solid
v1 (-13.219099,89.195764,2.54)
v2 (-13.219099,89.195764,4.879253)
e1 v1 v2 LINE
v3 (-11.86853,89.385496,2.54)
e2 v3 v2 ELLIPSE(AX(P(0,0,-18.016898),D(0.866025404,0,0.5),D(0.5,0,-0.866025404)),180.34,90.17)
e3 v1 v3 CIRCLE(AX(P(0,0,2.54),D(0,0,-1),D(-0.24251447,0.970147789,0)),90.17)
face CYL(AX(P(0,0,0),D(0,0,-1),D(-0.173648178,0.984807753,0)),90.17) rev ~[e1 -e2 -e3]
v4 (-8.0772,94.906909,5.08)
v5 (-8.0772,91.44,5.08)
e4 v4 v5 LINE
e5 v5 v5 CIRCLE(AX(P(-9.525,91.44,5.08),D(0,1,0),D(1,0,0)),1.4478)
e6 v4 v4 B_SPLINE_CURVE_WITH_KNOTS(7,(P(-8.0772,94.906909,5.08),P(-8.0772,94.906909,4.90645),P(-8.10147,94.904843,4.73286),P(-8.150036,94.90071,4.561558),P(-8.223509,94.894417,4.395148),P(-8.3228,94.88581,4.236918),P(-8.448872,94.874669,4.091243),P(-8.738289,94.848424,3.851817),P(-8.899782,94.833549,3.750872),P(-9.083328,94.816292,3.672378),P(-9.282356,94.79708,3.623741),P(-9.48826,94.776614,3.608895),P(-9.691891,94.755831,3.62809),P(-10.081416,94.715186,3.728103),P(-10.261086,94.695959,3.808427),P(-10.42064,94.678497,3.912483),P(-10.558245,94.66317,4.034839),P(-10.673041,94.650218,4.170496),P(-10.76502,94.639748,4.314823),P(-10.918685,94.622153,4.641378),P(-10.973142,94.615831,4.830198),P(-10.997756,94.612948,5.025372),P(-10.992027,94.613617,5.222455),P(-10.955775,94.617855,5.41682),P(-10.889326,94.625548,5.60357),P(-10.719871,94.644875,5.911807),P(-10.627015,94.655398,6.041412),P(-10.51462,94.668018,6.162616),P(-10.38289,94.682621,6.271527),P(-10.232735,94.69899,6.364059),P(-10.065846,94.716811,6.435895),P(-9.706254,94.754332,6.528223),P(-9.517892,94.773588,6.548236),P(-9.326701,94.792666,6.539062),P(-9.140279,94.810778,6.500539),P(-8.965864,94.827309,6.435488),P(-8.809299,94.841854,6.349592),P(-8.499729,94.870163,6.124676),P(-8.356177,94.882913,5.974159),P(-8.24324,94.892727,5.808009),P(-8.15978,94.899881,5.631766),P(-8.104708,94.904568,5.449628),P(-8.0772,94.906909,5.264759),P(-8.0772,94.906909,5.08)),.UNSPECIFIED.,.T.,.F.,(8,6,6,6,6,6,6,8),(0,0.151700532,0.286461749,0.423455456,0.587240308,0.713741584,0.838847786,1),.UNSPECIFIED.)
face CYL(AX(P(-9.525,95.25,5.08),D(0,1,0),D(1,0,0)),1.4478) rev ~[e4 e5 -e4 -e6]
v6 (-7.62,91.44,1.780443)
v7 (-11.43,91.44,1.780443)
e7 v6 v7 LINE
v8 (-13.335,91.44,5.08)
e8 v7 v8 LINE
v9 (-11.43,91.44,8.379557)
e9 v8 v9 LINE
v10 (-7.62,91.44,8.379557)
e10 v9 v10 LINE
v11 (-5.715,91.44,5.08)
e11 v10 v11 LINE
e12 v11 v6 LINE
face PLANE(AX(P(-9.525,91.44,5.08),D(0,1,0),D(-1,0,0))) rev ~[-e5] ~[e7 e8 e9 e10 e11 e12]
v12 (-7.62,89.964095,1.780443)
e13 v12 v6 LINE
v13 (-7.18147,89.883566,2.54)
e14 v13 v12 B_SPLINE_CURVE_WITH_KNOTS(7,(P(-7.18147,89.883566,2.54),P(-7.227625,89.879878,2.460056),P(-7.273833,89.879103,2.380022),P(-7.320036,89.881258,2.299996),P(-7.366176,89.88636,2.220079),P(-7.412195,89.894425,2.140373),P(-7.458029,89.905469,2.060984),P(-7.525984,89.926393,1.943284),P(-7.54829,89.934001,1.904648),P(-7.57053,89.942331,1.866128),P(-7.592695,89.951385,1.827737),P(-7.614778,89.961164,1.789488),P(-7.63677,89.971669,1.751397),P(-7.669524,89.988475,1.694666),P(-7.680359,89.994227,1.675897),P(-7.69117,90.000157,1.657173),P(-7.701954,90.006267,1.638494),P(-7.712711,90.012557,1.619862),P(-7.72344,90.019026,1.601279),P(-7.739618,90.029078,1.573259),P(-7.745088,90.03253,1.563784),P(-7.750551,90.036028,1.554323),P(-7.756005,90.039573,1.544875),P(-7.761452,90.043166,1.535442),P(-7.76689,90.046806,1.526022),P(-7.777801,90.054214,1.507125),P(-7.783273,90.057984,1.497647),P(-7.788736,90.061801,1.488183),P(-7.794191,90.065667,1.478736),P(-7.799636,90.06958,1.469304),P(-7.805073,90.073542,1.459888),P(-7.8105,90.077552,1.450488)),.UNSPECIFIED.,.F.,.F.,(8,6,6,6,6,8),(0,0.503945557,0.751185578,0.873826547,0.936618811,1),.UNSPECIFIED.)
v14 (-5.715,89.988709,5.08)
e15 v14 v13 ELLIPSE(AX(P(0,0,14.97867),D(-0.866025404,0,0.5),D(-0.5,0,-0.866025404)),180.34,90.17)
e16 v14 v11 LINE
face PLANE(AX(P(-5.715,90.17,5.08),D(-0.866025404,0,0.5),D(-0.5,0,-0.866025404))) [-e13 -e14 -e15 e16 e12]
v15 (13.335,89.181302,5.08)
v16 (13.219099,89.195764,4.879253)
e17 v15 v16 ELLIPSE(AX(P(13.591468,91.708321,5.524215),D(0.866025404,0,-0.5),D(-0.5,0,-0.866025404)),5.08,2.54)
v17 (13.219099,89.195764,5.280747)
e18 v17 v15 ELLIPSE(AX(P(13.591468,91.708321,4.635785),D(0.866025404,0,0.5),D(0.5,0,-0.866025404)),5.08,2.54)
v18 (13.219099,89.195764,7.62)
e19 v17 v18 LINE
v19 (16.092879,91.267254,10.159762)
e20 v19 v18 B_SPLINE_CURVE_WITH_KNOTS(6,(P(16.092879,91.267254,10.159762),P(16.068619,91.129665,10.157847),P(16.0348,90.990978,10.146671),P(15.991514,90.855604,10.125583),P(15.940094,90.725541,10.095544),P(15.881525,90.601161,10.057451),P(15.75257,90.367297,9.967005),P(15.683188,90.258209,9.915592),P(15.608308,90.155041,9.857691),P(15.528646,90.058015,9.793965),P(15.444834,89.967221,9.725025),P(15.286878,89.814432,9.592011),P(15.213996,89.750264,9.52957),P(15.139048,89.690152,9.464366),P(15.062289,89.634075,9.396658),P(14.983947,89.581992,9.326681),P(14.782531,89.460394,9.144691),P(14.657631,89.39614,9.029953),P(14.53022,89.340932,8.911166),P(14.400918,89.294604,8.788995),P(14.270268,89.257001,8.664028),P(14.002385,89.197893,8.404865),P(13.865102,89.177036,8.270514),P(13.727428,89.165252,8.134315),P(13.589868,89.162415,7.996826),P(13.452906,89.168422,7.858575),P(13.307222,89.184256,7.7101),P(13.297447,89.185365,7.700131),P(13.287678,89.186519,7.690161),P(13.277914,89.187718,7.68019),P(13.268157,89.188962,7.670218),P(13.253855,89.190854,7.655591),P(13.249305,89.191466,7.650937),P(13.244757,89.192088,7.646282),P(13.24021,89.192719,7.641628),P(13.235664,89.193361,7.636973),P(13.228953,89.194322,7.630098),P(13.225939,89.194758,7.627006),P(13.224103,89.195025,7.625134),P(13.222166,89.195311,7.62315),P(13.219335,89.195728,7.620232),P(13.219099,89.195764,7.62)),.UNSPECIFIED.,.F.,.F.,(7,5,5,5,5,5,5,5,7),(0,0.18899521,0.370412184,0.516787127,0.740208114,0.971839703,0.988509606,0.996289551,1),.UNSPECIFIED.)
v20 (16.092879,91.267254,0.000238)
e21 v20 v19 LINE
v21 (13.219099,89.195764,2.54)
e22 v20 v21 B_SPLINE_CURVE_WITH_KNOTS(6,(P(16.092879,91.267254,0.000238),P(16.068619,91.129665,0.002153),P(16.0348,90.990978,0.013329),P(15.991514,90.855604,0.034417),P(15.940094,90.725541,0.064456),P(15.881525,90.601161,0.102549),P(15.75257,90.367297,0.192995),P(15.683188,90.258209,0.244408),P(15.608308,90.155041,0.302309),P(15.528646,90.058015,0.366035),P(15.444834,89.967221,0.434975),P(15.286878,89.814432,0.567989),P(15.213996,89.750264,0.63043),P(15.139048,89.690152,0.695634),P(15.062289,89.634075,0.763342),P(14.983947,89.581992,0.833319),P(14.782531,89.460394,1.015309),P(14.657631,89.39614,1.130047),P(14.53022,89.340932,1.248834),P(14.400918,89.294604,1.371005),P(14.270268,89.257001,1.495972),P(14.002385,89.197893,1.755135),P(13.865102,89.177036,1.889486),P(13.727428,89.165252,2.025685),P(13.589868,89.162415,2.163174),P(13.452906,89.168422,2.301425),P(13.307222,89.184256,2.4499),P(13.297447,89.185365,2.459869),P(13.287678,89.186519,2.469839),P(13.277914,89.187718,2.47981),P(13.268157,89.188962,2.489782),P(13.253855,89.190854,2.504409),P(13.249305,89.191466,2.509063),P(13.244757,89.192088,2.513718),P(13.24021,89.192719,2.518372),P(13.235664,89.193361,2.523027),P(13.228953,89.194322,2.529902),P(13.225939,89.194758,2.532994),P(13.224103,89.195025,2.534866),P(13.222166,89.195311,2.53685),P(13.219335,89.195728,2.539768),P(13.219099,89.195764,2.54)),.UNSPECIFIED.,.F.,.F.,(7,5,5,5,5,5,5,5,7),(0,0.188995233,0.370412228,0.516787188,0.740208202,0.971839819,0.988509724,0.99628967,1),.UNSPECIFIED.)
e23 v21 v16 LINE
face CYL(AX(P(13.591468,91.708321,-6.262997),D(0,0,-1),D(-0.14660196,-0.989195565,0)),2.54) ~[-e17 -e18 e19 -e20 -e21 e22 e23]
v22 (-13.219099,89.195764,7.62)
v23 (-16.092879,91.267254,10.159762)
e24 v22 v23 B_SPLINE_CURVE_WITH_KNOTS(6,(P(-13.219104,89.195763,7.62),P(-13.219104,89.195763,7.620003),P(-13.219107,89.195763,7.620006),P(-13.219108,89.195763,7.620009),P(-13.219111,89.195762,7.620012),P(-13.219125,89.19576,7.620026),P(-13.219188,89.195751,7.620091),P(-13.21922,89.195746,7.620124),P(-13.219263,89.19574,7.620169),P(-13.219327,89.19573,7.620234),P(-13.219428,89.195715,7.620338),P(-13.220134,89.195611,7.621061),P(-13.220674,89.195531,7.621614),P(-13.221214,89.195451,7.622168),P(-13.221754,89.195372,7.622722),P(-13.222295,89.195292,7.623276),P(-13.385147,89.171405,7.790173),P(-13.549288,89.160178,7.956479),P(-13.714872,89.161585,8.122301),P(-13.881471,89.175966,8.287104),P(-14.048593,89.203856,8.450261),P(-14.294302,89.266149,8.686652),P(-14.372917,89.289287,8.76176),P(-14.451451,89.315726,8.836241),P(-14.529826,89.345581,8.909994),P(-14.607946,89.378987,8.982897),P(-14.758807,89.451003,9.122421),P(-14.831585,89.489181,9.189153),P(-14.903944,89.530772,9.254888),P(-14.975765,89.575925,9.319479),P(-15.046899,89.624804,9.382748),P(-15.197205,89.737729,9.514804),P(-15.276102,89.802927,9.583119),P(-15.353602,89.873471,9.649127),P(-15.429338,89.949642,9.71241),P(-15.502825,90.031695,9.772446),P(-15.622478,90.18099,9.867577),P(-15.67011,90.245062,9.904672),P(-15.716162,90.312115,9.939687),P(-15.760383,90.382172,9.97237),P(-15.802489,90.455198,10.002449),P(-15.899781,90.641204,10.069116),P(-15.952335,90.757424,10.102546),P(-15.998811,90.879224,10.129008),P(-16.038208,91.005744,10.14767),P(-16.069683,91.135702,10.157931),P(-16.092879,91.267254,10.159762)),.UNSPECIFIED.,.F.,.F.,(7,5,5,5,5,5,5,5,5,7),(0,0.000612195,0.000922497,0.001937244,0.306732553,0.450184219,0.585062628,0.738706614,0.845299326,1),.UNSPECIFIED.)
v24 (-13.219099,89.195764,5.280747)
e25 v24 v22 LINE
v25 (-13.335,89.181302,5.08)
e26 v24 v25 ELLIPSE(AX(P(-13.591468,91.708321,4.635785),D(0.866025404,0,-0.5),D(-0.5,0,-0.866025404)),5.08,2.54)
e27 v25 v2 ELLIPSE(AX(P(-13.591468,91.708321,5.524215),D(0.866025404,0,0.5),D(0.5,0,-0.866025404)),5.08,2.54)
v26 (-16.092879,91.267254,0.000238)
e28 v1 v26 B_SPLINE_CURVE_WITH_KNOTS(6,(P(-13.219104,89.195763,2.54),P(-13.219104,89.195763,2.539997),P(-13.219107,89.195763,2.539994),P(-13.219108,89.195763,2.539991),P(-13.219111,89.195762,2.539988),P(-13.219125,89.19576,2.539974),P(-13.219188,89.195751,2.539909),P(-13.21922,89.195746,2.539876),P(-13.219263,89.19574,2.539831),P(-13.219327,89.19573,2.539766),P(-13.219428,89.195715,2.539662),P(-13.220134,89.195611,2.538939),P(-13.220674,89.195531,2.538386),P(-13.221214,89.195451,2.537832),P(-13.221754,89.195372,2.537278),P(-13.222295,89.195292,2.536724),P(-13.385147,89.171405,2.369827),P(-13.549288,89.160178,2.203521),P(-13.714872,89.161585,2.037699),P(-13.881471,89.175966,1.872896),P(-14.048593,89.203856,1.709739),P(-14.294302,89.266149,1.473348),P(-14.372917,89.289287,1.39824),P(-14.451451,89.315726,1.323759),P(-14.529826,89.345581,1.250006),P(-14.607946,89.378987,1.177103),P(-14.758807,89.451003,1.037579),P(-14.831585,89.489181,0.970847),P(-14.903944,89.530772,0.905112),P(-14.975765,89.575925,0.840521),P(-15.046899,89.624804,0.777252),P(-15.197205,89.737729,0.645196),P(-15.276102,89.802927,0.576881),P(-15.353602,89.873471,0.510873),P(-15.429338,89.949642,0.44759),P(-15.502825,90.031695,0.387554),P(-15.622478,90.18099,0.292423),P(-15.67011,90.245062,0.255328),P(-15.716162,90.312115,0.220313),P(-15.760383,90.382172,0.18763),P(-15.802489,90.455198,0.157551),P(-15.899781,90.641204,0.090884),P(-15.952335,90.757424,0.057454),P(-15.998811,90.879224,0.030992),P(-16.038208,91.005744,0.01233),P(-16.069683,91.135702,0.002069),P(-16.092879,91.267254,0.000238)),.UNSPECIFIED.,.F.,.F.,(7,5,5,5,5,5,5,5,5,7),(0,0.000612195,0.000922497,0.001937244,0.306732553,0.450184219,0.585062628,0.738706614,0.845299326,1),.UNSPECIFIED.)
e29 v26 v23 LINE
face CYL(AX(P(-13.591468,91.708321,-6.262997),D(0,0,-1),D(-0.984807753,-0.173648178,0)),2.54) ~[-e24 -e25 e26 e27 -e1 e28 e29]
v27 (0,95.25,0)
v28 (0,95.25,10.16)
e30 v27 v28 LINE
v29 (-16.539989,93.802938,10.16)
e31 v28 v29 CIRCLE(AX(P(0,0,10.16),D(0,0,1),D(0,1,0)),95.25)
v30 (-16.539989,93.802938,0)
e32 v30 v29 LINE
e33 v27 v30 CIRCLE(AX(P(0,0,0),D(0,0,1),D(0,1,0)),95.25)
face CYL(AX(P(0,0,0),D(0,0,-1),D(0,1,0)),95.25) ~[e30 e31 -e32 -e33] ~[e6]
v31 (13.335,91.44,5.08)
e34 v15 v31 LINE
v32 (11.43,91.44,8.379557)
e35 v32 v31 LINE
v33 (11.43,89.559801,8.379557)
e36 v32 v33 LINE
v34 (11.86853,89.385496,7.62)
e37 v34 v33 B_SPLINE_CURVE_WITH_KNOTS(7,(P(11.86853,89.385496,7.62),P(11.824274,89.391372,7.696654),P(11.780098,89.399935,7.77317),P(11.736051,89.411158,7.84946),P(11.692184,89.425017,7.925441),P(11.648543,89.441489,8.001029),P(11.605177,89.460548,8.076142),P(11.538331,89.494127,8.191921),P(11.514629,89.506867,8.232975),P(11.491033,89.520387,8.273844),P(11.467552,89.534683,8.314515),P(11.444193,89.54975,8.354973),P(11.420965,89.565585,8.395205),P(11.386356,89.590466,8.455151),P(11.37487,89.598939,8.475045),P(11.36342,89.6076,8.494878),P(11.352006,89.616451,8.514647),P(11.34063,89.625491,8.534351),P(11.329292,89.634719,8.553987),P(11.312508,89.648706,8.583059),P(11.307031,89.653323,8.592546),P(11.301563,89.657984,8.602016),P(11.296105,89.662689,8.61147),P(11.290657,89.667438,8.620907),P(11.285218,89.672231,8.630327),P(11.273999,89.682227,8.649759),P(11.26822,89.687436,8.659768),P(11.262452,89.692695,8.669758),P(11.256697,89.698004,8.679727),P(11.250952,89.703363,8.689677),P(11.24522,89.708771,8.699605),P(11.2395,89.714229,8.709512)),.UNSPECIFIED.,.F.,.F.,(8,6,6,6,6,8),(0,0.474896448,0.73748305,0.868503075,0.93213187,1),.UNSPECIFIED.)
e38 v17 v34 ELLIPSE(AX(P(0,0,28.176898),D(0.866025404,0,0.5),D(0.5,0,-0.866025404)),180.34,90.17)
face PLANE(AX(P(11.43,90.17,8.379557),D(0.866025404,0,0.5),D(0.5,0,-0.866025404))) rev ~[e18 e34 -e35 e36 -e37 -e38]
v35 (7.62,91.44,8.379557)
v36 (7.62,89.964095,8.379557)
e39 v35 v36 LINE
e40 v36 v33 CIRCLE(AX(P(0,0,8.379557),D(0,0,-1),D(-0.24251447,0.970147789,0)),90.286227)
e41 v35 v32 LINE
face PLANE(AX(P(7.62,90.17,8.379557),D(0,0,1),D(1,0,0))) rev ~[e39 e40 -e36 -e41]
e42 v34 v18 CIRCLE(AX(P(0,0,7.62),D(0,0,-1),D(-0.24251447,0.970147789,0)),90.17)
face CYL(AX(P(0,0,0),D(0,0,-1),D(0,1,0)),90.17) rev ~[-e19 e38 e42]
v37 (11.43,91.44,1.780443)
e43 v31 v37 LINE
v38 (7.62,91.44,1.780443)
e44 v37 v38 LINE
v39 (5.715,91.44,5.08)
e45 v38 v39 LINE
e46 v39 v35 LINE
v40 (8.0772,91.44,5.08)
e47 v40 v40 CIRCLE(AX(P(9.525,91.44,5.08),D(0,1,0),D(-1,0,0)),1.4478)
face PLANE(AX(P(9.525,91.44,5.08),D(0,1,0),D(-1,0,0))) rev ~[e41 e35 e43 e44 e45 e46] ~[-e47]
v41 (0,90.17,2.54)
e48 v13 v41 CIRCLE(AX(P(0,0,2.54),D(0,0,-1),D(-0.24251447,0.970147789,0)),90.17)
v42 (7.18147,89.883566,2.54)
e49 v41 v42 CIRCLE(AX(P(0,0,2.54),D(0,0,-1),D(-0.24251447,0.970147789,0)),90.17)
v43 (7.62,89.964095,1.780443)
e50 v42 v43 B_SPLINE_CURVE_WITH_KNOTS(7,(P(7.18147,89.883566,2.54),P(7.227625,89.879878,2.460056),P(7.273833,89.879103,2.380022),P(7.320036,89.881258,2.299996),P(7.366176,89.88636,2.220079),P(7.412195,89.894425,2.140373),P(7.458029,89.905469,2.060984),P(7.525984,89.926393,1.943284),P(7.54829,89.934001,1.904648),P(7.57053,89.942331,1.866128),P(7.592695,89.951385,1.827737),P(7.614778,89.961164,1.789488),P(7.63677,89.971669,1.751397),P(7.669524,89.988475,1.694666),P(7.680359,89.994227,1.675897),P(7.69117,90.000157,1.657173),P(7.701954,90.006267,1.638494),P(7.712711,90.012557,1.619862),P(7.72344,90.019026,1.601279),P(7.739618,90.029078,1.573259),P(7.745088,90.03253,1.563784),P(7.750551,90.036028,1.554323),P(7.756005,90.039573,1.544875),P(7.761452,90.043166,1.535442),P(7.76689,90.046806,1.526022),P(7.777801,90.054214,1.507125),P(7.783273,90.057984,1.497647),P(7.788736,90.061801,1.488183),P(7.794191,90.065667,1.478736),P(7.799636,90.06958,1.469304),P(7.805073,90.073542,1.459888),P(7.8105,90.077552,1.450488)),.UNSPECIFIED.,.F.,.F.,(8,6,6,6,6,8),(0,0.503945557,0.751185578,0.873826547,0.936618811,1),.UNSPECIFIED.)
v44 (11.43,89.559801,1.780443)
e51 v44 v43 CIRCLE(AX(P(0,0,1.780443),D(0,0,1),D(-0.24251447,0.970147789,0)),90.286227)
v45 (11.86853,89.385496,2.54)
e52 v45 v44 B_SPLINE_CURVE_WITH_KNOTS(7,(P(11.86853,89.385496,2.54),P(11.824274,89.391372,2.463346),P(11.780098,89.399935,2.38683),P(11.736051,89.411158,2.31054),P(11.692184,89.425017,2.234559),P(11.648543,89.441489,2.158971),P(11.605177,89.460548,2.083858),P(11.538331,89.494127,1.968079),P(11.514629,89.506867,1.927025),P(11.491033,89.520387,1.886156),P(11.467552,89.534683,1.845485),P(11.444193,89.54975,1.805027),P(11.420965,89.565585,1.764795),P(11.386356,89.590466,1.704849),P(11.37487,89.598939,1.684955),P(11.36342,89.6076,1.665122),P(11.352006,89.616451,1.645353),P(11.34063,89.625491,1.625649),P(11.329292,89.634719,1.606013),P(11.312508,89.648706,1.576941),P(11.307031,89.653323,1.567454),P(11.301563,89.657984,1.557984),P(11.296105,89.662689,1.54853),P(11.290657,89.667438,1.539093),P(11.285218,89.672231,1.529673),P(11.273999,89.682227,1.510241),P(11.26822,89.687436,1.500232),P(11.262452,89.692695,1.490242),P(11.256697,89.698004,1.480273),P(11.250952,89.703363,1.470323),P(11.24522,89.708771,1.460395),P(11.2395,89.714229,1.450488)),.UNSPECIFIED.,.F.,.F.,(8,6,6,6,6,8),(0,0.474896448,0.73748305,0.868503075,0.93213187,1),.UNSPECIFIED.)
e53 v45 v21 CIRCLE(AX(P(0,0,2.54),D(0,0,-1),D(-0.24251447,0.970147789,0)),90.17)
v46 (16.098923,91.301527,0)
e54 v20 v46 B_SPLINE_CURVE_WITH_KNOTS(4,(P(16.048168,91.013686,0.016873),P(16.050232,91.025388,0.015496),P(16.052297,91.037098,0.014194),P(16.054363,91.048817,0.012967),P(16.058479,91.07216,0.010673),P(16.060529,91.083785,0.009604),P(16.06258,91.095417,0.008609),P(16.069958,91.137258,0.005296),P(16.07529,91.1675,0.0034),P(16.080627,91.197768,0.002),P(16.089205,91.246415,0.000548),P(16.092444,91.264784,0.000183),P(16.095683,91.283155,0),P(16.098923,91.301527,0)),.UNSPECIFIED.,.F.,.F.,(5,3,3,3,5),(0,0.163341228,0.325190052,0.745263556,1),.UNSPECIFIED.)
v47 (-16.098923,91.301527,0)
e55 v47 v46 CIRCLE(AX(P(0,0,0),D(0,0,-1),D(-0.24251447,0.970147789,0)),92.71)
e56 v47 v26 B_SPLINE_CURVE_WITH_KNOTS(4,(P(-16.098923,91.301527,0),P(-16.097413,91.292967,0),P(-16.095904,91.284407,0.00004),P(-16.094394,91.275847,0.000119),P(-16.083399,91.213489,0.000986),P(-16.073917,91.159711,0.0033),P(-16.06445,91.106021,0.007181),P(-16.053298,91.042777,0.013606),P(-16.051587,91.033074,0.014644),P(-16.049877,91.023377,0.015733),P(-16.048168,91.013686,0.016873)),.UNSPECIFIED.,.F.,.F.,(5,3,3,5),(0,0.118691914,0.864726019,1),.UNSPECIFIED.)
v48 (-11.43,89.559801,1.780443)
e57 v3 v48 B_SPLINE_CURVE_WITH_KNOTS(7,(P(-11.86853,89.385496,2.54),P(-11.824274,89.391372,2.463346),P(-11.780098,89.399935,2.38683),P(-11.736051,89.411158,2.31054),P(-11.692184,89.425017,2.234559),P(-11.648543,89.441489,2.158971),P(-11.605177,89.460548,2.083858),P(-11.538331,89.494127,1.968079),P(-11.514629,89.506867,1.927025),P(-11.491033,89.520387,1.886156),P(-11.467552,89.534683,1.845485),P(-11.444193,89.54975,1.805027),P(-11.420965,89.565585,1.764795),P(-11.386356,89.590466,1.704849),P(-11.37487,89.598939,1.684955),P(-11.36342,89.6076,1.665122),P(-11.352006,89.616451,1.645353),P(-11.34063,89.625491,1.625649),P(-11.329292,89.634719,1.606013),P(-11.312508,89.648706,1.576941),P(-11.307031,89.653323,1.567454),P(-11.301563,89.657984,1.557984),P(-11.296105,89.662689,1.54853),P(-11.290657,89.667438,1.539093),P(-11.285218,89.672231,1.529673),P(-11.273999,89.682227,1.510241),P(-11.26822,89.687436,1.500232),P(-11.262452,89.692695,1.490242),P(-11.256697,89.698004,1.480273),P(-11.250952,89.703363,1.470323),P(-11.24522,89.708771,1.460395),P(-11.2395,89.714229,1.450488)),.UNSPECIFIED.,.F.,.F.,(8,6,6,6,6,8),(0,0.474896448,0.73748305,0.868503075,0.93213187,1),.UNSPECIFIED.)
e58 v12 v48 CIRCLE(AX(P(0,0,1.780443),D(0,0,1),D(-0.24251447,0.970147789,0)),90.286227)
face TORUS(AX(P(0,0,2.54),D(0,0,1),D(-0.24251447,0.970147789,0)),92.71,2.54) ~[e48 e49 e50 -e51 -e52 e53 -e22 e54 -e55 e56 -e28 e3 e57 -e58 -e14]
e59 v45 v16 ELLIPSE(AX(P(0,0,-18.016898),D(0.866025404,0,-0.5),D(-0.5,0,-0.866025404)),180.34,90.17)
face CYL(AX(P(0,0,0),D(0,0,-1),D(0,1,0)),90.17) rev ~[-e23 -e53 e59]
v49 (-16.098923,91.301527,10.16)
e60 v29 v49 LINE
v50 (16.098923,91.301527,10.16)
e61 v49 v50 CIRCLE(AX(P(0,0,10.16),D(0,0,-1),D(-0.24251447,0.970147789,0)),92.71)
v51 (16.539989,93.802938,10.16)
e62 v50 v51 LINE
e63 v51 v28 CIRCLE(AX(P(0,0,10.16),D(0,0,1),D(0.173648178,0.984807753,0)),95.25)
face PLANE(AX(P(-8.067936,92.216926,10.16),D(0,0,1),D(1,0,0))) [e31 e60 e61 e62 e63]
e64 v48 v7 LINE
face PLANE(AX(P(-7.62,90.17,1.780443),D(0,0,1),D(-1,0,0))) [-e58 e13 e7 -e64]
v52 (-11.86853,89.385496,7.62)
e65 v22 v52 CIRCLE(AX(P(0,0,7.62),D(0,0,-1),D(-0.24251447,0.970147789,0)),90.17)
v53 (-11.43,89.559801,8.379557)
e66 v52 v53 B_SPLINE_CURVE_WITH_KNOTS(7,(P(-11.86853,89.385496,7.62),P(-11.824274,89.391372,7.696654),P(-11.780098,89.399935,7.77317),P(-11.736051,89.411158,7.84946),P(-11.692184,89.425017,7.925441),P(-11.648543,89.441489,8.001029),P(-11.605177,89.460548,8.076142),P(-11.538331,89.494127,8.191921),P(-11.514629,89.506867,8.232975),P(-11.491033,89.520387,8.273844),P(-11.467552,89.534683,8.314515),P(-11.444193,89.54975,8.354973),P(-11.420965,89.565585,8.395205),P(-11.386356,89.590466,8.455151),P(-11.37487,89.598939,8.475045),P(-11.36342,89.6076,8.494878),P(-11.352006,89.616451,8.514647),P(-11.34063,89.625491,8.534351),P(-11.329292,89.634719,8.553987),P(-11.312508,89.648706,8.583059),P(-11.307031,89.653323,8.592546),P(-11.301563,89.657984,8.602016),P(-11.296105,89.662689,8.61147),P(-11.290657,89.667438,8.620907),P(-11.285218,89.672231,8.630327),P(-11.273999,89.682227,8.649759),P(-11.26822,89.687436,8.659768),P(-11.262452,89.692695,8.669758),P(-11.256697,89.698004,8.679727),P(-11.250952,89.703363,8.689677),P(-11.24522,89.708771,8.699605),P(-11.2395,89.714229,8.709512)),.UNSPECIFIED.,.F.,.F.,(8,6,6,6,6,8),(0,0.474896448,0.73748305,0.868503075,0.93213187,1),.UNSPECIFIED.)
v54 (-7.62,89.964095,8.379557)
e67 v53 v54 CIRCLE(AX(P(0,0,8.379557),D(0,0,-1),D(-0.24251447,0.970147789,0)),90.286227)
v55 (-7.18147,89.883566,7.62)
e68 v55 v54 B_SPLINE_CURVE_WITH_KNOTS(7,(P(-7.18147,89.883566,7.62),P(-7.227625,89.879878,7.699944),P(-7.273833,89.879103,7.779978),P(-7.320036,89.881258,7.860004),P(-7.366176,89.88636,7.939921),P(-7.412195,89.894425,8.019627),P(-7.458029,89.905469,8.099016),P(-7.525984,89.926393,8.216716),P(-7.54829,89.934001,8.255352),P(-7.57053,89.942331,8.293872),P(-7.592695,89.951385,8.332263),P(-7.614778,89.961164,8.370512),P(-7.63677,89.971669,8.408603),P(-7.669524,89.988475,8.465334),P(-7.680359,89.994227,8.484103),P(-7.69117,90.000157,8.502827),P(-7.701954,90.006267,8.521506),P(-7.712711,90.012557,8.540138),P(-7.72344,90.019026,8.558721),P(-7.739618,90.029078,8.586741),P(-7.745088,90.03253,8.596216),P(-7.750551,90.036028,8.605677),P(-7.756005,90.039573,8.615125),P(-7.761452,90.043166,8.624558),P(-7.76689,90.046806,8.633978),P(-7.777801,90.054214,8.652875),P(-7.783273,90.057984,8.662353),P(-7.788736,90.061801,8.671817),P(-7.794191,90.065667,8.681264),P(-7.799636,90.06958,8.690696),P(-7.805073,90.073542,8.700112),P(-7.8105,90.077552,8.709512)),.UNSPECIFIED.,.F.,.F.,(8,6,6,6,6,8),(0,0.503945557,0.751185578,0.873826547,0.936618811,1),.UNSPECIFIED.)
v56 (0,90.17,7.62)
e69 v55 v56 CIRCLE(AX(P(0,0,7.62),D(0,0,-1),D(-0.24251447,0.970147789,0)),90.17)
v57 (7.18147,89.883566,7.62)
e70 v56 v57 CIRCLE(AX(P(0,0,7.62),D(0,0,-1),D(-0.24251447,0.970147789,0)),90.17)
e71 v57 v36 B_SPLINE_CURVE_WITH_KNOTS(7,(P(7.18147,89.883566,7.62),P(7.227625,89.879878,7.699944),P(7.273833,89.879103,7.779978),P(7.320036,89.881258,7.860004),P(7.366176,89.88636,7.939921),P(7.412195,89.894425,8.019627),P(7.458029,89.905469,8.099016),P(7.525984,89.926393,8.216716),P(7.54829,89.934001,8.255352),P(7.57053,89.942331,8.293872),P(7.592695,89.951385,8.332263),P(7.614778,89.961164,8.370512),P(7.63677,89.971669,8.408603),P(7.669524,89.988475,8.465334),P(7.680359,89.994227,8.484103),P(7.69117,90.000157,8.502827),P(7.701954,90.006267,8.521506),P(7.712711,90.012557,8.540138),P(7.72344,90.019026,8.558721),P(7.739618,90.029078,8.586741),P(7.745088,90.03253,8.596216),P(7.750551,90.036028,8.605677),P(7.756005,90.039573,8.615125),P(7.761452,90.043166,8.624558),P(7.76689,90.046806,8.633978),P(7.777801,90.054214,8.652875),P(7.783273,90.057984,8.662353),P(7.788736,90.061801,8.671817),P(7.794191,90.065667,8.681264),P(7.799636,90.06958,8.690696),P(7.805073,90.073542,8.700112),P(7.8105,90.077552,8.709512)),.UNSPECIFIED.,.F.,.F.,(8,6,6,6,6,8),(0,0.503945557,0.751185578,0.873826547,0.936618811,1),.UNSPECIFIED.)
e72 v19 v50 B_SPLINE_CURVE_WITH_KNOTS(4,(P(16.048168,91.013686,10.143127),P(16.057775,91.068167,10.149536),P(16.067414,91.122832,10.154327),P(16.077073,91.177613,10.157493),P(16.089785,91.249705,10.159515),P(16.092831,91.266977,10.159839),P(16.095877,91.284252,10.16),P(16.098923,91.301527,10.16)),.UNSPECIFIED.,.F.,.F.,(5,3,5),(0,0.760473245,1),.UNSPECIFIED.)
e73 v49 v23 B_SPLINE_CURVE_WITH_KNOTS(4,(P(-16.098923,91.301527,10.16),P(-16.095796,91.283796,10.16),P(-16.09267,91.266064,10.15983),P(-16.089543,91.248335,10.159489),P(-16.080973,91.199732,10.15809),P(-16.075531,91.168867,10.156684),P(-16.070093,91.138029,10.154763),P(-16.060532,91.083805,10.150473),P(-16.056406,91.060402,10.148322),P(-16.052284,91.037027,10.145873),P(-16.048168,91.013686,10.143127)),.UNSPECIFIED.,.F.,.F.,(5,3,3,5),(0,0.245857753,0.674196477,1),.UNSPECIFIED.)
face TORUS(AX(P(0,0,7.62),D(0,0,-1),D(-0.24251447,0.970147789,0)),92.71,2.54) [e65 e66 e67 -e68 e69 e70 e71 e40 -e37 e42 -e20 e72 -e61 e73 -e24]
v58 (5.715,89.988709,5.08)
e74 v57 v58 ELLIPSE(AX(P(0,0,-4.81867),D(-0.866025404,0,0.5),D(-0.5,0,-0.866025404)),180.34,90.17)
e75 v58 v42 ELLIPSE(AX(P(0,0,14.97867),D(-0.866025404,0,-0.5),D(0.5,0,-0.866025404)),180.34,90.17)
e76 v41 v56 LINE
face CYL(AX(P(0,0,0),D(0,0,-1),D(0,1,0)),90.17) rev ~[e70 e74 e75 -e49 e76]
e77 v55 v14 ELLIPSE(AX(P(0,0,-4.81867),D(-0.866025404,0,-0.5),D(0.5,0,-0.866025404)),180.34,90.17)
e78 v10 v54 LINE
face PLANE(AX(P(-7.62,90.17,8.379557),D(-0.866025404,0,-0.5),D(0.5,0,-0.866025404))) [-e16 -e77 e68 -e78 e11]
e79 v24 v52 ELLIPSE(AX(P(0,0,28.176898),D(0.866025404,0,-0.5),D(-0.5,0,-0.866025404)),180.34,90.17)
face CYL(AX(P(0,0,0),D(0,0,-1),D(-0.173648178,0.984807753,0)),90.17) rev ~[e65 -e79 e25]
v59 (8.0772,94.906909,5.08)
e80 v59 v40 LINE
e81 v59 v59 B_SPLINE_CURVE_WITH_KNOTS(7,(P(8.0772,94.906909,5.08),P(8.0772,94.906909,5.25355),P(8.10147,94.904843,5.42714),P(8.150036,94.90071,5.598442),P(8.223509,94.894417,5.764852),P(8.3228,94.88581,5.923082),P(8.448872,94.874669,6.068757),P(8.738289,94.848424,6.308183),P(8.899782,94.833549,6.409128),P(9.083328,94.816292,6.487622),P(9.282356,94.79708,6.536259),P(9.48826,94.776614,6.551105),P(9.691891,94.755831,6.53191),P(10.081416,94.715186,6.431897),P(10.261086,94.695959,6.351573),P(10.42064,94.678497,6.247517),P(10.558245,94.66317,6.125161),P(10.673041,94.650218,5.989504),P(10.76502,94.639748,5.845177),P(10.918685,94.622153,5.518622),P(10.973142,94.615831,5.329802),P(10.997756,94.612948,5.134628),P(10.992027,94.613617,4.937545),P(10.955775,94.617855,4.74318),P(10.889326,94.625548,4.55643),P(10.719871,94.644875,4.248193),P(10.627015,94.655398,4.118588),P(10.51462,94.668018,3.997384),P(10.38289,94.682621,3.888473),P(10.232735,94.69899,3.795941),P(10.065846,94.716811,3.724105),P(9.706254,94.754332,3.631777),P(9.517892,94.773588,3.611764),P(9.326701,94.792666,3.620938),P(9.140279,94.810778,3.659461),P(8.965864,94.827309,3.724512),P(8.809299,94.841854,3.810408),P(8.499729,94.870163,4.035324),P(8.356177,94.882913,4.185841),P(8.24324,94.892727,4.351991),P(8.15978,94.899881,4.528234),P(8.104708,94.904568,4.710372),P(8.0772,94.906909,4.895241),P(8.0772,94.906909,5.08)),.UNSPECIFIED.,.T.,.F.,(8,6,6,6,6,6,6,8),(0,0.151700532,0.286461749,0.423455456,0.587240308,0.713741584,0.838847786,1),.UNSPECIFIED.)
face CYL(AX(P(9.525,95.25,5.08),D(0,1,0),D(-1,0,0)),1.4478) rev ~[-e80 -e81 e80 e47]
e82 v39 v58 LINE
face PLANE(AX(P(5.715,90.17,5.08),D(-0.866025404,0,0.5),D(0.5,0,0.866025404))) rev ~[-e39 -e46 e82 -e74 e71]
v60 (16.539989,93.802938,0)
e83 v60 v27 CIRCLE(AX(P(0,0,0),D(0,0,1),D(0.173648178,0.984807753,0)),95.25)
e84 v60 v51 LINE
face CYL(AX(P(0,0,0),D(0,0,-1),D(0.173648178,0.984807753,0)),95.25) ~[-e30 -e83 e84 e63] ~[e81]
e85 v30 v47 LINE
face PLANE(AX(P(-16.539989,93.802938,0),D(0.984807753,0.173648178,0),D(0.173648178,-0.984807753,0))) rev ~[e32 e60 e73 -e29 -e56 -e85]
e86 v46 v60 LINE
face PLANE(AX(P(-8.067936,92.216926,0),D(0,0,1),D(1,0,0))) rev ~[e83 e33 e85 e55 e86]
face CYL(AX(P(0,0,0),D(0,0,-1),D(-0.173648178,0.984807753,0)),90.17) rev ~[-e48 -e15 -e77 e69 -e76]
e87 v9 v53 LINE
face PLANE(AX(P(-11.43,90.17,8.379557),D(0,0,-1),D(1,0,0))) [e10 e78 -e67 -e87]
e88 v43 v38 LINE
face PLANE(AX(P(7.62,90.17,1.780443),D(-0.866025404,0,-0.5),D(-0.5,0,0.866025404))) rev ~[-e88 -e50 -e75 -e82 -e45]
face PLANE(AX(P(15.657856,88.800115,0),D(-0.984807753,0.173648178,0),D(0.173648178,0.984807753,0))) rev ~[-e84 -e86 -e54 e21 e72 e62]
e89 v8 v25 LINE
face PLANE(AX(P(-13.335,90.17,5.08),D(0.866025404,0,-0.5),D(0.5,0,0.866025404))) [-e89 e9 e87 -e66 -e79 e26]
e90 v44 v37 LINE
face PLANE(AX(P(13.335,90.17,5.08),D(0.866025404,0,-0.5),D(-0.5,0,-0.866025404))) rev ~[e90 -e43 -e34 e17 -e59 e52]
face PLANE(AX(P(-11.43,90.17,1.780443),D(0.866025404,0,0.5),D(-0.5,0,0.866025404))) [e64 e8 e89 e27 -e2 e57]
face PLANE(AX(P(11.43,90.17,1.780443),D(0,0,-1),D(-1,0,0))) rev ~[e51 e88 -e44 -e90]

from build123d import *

# Parameters (mm, degrees)
F1_DEPTH     = 10.16
F5_R         = 1.4478
F6_DEPTH     = 25.4
F10_DEPTH    = 1.27
F11_T1_DEPTH = 22.6859947386
F11_T4_ANGLE = 28.0699881424
F11_T6_ANGLE = 28.0699881424


# Not quite as in the source:
# - a fillet or chamfer that OpenCascade refuses, or shapes differently, is made with other operations: its cross-section is extruded or revolved along the edge and cut away or added


with BuildPart() as f1:
    # F0 (on Top) → F1 (new body)
    with BuildSketch(Plane.XY):
        with BuildLine():
            ThreePointArc((0, 95.25), (-8.3015844967, 94.8875449932), (-16.5399889228, 93.8029384744))
            Line((-16.5399889228, 93.8029384744), (-15.6578561802, 88.8001150891))
            ThreePointArc((-15.6578561802, 88.8001150891), (-7.8588333236, 89.8268759269), (0, 90.17))
            Line((0, 90.17), (0, 95.25))
        make_face()
        with BuildLine():
            Line((15.6578561802, 88.8001150891), (16.5399889228, 93.8029384744))
            ThreePointArc((16.5399889228, 93.8029384744), (8.3015844967, 94.8875449932), (0, 95.25))
            Line((0, 95.25), (0, 90.17))
            ThreePointArc((0, 90.17), (7.8588333236, 89.8268759269), (15.6578561802, 88.8001150891))
        make_face()
    extrude(amount=F1_DEPTH)

    # F5 (on line) → F6 (cut)
    with BuildSketch(Plane(origin=(0, 95.25, 0), x_dir=(-1, 0, 0), z_dir=(0, 1, 0))):
        with Locations((-9.525, 5.08)):
            Circle(F5_R)
        with BuildLine():
            ThreePointArc((10.9728, 5.08), (9.525, 6.5278), (8.0772, 5.08))
            ThreePointArc((8.0772, 5.08), (9.525, 3.6322), (10.9728, 5.08))
        make_face()
    extrude(amount=-F6_DEPTH, mode=Mode.SUBTRACT)

    # F9 (on line) → F10 (cut, symmetric)
    with BuildSketch(Plane(origin=(0, 90.17, 0), x_dir=(-1, 0, 0), z_dir=(0, 1, 0))):
        Polygon((7.62, 8.3795567884), (5.715, 5.08), (7.62, 1.7804432116), (11.43, 1.7804432116), (13.335, 5.08), (11.43, 8.3795567884), align=None)
        Polygon((-11.43, 8.3795567884), (-13.335, 5.08), (-11.43, 1.7804432116), (-7.62, 1.7804432116), (-5.715, 5.08), (-7.62, 8.3795567884), align=None)
    extrude(amount=F10_DEPTH, both=True, mode=Mode.SUBTRACT)

    # F11: fillet of radius 2.54 on 4 edges, made by hand

    # F11_s2 → F11_t1 (cut)
    with BuildSketch(Plane.XY.offset(-6.2629973693)):
        with BuildLine():
            ThreePointArc((13.2190987409, 89.1957640725), (15.0767198196, 89.6478290697), (16.0928794122, 91.2672544357))
            Line((16.0928794122, 91.2672544357), (15.6578561802, 88.8001150891))
            ThreePointArc((15.6578561802, 88.8001150891), (14.4398326136, 89.0062926657), (13.2190987409, 89.1957640725))
        make_face()
        with BuildLine():
            ThreePointArc((-16.0928794122, 91.2672544357), (-15.0767198196, 89.6478290697), (-13.2190987409, 89.1957640725))
            ThreePointArc((-13.2190987409, 89.1957640725), (-14.4398326136, 89.0062926657), (-15.6578561802, 88.8001150891))
            Line((-15.6578561802, 88.8001150891), (-16.0928794122, 91.2672544357))
        make_face()
    extrude(amount=F11_T1_DEPTH, mode=Mode.SUBTRACT)

    # F11_s3 → F11_t4 (revolve, cut)
    with BuildSketch(Plane(origin=(0, 0, 0), x_dir=(0, 0, 1), z_dir=(-0.9701477887, -0.24251447, 0))):
        with BuildLine():
            ThreePointArc((7.62, 90.17), (9.4160512242, 90.9139487758), (10.16, 92.71))
            Line((10.16, 92.71), (10.16, 90.17))
            Line((10.16, 90.17), (7.62, 90.17))
        make_face()
    revolve(axis=Axis((0, 0, 10.16), (0, 0, -1)), revolution_arc=F11_T4_ANGLE, mode=Mode.SUBTRACT)

    # F11_s5 → F11_t6 (revolve, cut)
    with BuildSketch(Plane(origin=(0, 0, 0), x_dir=(0, 0, 1), z_dir=(-0.9701477887, -0.24251447, 0))):
        with BuildLine():
            ThreePointArc((2.54, 90.17), (0.7439487758, 90.9139487758), (0, 92.71))
            Line((0, 92.71), (0, 90.17))
            Line((0, 90.17), (2.54, 90.17))
        make_face()
    revolve(axis=Axis((0, 0, 0), (0, 0, -1)), revolution_arc=F11_T6_ANGLE, mode=Mode.SUBTRACT)


solid = f1.part
